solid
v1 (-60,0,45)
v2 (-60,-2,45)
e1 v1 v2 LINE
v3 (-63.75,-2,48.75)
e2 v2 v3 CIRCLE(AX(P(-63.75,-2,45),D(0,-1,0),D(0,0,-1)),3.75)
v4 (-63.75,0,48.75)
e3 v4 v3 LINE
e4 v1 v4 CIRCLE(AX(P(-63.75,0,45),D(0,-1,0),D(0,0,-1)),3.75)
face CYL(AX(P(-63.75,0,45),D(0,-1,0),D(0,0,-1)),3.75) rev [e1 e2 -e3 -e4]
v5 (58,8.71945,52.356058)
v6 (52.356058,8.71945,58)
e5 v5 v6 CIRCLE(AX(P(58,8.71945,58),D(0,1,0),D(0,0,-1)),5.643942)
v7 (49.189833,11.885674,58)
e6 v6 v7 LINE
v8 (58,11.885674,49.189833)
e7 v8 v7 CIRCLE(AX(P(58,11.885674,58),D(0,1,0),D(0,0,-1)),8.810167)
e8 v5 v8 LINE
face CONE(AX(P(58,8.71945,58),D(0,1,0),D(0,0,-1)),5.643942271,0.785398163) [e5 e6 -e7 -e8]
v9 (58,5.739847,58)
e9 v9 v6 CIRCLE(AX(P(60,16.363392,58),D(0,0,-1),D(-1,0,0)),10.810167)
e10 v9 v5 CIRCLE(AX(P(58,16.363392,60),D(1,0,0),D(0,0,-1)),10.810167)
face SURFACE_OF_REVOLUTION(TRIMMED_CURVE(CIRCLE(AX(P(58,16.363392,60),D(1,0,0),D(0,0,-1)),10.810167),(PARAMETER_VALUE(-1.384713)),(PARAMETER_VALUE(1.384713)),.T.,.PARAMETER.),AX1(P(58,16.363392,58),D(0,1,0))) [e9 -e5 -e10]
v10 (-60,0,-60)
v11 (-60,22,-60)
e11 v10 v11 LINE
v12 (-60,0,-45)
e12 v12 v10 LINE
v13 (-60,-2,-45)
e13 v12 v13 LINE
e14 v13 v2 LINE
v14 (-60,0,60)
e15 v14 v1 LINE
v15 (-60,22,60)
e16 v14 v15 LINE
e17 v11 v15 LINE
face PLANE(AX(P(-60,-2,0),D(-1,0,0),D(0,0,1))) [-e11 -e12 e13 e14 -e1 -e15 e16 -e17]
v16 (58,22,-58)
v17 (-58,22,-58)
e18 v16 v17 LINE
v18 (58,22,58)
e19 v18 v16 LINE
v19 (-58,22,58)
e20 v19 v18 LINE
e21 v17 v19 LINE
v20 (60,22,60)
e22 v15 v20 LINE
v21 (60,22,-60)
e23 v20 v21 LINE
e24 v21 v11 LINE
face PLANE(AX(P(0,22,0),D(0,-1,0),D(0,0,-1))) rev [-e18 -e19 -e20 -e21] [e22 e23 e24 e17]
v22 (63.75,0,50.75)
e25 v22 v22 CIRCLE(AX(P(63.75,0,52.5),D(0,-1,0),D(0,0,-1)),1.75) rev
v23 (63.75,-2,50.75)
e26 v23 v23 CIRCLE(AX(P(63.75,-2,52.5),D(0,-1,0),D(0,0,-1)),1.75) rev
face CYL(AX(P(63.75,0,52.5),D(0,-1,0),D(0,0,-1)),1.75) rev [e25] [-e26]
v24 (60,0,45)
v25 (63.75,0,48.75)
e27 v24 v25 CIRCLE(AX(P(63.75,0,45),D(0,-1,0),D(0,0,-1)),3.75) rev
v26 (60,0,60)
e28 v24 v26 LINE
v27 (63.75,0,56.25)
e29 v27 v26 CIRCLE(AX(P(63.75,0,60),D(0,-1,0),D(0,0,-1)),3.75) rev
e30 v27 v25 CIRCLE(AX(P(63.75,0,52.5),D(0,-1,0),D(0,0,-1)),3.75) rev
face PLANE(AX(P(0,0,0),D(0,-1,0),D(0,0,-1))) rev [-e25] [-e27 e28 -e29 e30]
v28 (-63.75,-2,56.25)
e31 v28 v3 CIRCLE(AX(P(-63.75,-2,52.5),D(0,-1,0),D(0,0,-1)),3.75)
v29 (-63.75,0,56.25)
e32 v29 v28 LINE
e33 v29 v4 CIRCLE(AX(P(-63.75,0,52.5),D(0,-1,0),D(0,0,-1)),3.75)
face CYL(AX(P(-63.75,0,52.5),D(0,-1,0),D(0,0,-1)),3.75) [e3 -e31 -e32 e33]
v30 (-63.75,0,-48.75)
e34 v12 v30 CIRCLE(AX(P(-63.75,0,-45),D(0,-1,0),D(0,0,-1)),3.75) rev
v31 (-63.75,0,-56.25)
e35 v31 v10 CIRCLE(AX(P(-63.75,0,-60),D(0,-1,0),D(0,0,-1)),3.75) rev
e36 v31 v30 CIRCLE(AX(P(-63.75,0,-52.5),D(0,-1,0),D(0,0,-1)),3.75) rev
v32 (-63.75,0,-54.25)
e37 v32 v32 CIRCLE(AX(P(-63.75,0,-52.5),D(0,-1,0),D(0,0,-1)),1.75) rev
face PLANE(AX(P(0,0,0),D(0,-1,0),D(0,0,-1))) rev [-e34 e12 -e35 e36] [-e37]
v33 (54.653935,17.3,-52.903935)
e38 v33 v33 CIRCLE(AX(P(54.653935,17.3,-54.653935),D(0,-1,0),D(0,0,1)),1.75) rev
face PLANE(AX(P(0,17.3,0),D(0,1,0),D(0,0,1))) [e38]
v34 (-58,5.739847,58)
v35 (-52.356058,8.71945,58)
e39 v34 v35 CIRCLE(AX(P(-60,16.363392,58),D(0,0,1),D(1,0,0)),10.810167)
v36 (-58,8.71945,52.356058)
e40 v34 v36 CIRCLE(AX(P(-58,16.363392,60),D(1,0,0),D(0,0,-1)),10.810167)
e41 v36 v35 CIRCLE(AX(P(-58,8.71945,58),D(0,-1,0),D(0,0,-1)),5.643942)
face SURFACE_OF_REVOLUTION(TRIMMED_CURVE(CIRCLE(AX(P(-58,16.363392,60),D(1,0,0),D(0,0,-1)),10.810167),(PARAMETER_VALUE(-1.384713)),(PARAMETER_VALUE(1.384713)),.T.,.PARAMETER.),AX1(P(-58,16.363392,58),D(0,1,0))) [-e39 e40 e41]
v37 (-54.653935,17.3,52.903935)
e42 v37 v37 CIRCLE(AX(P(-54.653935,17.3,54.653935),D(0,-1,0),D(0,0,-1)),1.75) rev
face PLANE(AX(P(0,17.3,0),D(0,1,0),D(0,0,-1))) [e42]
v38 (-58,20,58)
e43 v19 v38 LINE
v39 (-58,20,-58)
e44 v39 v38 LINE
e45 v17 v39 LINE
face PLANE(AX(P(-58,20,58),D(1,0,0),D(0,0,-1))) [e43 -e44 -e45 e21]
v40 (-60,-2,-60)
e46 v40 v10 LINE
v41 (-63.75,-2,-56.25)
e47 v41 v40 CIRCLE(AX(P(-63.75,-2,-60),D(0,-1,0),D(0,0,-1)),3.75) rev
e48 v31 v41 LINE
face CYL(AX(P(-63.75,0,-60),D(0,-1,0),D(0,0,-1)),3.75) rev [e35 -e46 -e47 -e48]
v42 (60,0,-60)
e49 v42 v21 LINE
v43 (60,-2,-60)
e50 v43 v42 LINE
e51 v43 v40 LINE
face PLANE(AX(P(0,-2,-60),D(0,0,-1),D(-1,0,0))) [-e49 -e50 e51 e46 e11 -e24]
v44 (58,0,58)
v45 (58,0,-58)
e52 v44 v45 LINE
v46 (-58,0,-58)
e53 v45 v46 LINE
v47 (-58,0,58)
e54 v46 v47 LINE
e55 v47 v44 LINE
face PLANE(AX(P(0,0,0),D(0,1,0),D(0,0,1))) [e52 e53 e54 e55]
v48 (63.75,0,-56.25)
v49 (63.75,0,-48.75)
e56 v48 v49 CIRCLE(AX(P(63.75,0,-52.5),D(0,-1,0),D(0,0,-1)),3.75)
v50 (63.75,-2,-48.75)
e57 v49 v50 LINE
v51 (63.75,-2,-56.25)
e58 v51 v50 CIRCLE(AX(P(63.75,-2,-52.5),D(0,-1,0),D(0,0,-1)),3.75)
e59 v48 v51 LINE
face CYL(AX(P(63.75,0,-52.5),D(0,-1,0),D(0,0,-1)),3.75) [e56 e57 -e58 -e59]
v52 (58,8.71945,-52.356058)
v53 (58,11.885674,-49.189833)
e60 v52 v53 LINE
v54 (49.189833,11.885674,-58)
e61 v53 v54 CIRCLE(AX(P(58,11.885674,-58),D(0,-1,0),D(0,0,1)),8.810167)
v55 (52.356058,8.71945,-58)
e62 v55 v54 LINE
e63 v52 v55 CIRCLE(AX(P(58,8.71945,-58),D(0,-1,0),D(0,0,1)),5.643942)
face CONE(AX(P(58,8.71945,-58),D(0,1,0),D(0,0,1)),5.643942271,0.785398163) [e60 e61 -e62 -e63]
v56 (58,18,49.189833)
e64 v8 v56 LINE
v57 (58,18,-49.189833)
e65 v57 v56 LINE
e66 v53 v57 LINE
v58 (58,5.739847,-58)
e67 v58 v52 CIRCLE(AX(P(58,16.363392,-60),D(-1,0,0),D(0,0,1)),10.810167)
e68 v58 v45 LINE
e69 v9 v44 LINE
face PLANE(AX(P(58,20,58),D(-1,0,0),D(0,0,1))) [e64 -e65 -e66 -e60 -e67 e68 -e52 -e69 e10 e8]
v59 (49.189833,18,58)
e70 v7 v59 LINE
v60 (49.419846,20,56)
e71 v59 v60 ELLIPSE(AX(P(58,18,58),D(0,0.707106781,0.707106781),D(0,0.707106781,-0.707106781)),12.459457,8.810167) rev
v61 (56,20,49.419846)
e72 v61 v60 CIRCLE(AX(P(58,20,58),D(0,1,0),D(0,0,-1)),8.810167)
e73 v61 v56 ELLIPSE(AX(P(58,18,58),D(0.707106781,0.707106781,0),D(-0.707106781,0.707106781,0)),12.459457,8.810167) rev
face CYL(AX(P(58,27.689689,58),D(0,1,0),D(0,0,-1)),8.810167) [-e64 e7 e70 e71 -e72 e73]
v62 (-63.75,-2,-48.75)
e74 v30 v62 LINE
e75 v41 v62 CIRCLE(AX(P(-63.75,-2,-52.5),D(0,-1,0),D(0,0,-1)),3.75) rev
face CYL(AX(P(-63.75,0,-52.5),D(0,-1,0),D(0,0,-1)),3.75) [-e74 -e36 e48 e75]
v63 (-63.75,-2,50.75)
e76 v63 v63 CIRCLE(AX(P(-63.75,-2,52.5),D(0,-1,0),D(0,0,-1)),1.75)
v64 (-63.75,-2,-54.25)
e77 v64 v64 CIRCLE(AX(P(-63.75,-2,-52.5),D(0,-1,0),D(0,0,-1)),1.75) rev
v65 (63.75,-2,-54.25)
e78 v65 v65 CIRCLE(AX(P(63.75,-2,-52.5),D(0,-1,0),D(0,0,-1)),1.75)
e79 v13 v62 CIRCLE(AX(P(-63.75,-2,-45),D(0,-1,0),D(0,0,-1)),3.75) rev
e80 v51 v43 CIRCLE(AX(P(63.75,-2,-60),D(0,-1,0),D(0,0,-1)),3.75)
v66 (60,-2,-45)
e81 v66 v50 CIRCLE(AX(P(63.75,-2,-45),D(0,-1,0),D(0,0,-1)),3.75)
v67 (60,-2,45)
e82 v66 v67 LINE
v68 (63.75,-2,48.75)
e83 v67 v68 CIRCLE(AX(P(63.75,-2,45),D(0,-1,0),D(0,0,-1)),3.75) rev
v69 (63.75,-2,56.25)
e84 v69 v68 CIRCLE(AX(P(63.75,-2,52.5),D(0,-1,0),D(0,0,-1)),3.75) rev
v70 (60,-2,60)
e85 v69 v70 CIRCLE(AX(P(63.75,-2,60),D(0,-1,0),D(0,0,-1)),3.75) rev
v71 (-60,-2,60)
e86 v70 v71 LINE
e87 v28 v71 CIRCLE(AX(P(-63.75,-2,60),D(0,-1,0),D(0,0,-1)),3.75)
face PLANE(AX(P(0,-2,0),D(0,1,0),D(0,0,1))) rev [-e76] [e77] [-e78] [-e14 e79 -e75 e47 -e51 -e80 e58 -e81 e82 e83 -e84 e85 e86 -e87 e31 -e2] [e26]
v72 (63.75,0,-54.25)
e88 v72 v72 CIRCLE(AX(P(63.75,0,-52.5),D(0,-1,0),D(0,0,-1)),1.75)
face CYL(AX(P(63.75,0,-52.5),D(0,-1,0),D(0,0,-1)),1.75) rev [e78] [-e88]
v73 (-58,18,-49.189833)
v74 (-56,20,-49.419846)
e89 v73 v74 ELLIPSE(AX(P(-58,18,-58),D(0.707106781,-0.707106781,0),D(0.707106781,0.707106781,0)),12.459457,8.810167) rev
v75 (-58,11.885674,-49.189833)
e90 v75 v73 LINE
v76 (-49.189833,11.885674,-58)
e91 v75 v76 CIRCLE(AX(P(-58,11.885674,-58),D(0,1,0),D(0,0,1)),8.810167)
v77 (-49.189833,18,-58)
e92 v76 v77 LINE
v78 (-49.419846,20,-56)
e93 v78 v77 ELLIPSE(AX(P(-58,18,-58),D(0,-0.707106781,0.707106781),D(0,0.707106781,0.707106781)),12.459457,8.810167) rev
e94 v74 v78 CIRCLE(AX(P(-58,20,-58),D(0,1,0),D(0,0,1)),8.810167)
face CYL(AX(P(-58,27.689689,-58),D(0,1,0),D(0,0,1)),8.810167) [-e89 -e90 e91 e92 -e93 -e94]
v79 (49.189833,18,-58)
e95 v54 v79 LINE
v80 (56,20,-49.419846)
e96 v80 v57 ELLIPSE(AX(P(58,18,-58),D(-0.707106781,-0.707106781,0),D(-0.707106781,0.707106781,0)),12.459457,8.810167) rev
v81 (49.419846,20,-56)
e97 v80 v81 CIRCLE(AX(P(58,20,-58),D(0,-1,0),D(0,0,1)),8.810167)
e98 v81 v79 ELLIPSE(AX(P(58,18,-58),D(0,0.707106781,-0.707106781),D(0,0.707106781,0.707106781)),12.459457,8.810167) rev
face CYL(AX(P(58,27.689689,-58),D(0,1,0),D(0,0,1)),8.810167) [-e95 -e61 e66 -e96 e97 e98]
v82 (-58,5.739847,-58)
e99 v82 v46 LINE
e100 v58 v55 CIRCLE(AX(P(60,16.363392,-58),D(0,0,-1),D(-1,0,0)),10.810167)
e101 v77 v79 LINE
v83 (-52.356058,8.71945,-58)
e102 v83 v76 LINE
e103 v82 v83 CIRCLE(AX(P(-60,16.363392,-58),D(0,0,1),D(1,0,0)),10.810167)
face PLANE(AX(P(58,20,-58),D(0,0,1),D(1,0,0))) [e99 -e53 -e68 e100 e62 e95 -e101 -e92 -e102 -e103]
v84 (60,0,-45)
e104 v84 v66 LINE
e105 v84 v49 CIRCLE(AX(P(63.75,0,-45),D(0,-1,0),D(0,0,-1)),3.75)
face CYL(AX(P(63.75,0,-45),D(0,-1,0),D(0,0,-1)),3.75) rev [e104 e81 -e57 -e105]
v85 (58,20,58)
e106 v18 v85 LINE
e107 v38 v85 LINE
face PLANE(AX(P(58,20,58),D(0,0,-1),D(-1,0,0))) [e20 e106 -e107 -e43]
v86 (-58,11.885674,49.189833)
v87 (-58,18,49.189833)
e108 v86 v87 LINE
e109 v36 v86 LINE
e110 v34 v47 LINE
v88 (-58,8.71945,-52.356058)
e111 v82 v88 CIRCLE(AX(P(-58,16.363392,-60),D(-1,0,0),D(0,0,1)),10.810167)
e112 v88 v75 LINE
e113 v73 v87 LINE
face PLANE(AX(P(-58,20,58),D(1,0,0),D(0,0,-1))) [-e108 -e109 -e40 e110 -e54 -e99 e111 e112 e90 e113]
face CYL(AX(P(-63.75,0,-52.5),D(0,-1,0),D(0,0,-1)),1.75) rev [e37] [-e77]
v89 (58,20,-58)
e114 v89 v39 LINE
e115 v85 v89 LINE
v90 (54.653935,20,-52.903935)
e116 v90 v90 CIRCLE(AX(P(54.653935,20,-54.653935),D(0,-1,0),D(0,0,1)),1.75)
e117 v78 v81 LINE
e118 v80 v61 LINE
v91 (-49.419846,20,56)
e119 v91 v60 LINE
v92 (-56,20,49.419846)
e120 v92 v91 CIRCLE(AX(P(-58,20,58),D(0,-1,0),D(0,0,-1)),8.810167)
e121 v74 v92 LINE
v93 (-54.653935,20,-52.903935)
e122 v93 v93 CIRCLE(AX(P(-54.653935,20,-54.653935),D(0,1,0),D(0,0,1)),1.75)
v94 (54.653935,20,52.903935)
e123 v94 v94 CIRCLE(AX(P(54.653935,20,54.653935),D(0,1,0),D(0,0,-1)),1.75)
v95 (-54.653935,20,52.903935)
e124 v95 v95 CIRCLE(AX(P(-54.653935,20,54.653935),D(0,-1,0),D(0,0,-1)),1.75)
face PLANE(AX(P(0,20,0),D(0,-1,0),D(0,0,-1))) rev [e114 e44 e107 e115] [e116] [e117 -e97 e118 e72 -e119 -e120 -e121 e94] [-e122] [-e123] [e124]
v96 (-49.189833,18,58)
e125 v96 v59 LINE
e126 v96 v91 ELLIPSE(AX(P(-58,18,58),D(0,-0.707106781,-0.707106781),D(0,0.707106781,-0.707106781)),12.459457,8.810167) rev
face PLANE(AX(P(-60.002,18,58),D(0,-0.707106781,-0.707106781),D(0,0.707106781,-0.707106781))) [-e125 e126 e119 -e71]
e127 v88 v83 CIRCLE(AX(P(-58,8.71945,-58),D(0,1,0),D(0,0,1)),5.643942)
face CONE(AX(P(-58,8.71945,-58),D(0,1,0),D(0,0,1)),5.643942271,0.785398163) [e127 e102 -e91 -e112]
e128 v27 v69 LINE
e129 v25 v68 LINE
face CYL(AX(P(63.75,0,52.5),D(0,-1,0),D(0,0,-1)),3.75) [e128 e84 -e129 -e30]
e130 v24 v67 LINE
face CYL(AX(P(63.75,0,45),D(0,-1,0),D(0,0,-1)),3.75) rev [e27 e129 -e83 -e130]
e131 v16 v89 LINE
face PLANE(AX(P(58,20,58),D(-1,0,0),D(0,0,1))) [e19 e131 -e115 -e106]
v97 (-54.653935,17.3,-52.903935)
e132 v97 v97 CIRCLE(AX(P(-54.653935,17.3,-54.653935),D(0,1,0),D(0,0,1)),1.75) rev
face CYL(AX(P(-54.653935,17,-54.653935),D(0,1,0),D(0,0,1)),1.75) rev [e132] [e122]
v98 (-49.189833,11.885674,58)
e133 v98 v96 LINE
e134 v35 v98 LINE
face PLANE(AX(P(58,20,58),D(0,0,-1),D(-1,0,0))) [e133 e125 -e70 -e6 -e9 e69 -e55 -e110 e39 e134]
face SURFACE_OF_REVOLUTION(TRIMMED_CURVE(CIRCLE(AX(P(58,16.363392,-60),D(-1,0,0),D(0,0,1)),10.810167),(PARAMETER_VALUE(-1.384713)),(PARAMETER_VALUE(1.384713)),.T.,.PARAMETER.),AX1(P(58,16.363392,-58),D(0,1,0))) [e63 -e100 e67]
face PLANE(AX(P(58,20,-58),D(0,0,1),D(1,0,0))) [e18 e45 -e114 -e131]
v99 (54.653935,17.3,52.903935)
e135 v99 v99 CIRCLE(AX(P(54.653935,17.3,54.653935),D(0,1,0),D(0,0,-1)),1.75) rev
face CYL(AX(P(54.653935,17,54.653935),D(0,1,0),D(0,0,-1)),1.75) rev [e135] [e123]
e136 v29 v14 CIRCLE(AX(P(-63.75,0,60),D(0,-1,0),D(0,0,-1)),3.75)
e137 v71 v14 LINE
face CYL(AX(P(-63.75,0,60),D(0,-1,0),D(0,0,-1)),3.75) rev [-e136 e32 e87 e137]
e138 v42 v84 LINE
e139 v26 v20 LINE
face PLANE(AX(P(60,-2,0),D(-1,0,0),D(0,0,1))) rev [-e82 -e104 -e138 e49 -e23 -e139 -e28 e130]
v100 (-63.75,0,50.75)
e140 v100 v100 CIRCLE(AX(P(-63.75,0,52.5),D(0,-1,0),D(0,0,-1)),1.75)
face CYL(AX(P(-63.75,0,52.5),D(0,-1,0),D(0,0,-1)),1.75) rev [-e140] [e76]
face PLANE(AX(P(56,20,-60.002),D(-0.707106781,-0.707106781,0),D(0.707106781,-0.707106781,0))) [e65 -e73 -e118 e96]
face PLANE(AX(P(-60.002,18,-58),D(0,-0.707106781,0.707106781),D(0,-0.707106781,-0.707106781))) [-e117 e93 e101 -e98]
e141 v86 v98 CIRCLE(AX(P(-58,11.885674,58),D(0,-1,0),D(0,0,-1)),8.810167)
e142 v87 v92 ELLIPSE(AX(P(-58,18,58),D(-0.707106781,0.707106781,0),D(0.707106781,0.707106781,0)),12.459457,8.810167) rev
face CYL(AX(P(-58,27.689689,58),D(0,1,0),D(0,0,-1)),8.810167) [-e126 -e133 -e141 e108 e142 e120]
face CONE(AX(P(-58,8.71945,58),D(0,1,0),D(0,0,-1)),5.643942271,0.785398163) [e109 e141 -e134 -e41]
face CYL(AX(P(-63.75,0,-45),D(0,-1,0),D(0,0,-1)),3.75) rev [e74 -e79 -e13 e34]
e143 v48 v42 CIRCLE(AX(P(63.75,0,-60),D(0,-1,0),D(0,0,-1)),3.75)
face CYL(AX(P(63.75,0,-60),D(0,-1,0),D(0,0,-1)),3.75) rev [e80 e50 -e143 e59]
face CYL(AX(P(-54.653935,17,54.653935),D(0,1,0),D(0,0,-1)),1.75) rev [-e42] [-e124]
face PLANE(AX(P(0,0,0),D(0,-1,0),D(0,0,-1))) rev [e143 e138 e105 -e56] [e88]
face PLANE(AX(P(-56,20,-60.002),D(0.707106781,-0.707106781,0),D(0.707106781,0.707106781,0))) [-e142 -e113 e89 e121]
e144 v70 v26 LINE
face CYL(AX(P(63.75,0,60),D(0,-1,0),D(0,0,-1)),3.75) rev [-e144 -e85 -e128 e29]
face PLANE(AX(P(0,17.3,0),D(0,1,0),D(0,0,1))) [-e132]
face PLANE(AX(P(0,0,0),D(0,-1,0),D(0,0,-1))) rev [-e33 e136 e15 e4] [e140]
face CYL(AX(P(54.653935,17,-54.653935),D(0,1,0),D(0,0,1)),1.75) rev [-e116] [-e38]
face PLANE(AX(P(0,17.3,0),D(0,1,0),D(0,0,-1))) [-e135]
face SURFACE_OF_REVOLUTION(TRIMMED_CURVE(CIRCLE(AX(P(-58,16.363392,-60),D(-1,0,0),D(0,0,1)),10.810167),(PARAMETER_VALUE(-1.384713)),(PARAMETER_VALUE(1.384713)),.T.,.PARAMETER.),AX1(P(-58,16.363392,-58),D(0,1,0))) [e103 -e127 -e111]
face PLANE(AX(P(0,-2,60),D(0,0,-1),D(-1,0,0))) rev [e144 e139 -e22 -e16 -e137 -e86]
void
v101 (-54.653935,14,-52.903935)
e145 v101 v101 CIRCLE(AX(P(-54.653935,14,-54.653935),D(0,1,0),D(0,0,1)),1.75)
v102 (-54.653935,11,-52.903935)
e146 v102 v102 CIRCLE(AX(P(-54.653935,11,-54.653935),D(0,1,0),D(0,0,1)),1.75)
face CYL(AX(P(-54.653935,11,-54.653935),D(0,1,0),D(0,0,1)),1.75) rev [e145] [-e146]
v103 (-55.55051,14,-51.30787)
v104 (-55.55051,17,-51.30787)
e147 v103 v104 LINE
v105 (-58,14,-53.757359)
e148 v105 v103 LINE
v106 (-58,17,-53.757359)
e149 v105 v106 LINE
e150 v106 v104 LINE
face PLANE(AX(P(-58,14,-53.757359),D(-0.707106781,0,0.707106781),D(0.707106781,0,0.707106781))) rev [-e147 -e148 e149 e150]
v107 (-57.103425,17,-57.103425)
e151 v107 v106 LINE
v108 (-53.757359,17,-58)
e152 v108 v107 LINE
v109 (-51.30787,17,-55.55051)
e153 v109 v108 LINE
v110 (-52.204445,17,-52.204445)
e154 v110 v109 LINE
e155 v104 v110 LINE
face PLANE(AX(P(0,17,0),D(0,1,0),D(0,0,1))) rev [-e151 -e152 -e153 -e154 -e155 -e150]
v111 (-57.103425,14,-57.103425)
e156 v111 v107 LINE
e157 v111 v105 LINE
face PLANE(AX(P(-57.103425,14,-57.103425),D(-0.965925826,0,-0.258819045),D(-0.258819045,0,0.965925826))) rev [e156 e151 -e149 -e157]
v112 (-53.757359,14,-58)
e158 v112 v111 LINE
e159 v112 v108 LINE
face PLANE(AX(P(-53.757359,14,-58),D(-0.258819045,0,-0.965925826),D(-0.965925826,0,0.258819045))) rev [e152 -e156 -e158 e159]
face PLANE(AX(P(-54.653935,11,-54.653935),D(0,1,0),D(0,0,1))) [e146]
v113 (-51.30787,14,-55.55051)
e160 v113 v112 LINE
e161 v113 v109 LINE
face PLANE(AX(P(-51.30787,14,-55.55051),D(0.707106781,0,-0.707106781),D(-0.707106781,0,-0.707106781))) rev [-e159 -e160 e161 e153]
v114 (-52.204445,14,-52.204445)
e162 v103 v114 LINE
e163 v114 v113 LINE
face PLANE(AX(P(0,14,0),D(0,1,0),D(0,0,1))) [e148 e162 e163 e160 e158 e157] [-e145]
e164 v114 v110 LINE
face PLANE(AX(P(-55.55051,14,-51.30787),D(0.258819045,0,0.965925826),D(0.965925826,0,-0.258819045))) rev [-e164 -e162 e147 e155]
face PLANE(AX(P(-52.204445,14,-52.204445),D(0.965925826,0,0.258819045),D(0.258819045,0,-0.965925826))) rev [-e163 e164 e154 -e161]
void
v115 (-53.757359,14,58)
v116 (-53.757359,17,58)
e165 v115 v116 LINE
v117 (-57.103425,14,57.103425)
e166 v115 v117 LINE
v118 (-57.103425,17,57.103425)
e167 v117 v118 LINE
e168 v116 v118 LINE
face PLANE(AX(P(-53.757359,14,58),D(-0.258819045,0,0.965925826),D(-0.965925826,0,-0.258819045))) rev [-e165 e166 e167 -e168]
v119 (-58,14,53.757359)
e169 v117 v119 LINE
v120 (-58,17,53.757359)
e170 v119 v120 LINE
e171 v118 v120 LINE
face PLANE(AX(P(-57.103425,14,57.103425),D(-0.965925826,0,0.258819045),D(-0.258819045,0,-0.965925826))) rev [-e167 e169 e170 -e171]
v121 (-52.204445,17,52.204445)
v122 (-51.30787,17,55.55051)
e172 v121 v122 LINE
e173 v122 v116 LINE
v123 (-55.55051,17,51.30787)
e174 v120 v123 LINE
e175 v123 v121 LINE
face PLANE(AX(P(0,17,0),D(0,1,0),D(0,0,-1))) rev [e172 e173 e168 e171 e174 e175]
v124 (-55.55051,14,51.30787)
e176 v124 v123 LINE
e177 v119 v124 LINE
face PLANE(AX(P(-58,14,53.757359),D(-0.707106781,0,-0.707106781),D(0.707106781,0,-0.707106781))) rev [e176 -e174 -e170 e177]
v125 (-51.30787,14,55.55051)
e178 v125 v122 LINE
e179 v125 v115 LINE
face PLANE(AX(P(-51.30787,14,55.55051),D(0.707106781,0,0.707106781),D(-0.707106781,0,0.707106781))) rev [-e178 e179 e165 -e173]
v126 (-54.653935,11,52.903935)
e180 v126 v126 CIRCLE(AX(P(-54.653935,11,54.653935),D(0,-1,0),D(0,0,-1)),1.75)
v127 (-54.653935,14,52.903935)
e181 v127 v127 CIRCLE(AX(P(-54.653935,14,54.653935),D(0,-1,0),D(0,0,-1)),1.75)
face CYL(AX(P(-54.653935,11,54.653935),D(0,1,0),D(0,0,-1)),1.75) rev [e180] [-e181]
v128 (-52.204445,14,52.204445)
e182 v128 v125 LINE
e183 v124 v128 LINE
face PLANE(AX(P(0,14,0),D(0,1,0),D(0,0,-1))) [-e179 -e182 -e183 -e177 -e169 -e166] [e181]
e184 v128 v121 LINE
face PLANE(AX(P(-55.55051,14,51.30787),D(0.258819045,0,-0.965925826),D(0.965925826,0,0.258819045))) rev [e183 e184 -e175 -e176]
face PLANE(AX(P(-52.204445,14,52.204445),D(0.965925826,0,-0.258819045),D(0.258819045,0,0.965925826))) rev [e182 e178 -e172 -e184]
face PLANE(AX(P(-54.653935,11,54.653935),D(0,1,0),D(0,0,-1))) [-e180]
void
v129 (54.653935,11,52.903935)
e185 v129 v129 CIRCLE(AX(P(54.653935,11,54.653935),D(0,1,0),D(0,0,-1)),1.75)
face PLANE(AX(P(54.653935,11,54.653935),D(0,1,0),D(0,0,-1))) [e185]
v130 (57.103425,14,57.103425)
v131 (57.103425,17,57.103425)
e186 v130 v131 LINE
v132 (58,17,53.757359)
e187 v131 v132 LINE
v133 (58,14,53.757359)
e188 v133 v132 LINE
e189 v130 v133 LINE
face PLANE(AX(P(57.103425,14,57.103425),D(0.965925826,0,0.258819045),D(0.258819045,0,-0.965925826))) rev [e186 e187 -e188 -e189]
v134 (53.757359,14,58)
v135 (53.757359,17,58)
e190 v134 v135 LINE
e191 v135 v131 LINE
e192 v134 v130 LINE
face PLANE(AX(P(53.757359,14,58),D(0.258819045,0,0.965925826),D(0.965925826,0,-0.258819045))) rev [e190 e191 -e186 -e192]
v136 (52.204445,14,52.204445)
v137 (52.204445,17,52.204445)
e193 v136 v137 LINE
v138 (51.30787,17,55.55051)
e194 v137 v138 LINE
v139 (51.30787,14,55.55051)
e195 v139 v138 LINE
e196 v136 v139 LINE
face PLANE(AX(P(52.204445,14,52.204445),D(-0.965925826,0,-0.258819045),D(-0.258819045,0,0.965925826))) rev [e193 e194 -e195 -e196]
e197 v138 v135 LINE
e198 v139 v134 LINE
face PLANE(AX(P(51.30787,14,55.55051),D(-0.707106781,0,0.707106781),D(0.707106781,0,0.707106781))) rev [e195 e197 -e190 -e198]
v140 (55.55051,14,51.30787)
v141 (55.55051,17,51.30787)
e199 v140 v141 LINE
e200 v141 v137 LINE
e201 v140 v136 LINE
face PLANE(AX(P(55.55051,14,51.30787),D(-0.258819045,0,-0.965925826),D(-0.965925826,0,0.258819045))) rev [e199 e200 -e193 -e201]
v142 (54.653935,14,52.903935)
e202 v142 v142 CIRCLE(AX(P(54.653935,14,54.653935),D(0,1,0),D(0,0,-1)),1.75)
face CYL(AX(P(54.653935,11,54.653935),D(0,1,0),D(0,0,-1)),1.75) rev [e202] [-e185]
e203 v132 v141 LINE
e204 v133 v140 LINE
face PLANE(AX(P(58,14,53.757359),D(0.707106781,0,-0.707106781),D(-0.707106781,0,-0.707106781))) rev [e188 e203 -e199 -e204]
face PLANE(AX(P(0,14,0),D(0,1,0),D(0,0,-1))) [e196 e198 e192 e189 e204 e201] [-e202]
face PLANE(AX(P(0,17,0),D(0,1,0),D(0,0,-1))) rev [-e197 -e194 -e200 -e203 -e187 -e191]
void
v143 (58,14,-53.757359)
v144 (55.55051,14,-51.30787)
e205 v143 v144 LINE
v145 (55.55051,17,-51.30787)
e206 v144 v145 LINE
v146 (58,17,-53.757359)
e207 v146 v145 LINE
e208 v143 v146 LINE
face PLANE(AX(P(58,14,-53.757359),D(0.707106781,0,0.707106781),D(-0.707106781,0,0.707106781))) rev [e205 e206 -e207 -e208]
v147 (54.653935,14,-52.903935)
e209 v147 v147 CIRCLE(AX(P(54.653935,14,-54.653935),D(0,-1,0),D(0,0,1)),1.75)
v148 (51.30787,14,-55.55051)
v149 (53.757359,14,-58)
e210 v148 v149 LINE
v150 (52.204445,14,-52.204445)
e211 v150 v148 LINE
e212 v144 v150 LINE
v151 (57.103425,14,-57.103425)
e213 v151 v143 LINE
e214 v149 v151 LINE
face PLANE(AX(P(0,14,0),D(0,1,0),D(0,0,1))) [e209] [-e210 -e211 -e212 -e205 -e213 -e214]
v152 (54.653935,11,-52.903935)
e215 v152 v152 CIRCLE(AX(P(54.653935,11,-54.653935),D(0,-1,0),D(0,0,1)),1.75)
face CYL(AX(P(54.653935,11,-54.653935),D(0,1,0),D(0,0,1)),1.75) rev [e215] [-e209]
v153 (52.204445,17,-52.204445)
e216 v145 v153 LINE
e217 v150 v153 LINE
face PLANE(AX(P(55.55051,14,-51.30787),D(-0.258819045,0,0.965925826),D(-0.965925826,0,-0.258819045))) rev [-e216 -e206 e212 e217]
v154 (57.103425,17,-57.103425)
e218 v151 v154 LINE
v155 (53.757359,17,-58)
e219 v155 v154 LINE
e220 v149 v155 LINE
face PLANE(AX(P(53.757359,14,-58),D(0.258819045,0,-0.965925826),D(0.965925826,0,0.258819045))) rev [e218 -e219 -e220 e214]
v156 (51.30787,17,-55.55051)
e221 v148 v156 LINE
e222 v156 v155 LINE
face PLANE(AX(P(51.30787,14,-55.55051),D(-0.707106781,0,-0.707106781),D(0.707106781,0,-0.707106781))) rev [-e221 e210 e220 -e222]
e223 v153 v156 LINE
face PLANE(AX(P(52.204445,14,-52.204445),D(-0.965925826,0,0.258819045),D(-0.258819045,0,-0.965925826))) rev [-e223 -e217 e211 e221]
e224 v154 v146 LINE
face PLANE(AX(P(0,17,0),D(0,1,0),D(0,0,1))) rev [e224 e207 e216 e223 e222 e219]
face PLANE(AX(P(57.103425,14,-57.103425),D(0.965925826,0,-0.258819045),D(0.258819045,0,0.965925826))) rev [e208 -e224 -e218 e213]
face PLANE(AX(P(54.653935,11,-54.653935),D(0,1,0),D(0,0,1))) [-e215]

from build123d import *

# Parameters (mm, degrees)
SKETCH1_W                       = 120
SKETCH1_H                       = 120
SKETCH1_W_2                     = 116
SKETCH1_H_2                     = 116
BOSS_EXTRUDE1_DEPTH             = 2
SKETCH1_3_W                     = 120
SKETCH1_3_H                     = 120
SKETCH1_3_W_2                   = 116
SKETCH1_3_H_2                   = 116
BOSS_EXTRUDE2_DEPTH             = 20
BOSS_EXTRUDE4_DEPTH             = 20
SKETCH16_R                      = 1.75
CUT_EXTRUDE8_DEPTH              = 3
CUT_EXTRUDE9_DEPTH              = 3
BOSS_EXTRUDE5_DEPTH             = 0.3
SKETCH18_R                      = 1.75
CUT_EXTRUDE10_DEPTH             = 3
CUT_REVOLVE5_DEPTH              = 5.739847272
CUT_REVOLVE5_START              = 1.8876
CUT_REVOLVE5_2_DEPTH            = 18.1124
CUT_REVOLVE5_3_ANGLE            = 90
SKETCH21_W                      = 120
SKETCH21_H                      = 120
SKETCH21_W_2                    = 116
SKETCH21_H_2                    = 116
BOSS_EXTRUDE6_DEPTH             = 2
BOSS_EXTRUDE7_REACH             = 89.658
BOSS_EXTRUDE7_DIRECTION_2_REACH = 89.658
BOSS_EXTRUDE8_REACH             = 89.658
BOSS_EXTRUDE8_DIRECTION_2_REACH = 89.658
SKETCH25_R                      = 3.75
SKETCH25_R_2                    = 1.75
BOSS_EXTRUDE10_DEPTH            = 2


with BuildPart() as part:
    # Sketch1 → Boss-Extrude1 (new body)
    # profile 1 of 2: a face of its own
    with BuildSketch(Plane(origin=(0, 0, 0), x_dir=(1, 0, 0), z_dir=(0, 1, 0))):
        Rectangle(SKETCH1_W, SKETCH1_H)
        Rectangle(SKETCH1_W_2, SKETCH1_H_2, mode=Mode.SUBTRACT)
    # profile 2 of 2: a face of its own
    with BuildSketch(Plane(origin=(0, 0, 0), x_dir=(1, 0, 0), z_dir=(0, 1, 0))):
        Rectangle(SKETCH1_W_2, SKETCH1_H_2)
    extrude(amount=-BOSS_EXTRUDE1_DEPTH)

    # Sketch1<3> → Boss-Extrude2 (add)
    with BuildSketch(Plane(origin=(0, 0, 0), x_dir=(1, 0, 0), z_dir=(0, 1, 0))):
        Rectangle(SKETCH1_3_W, SKETCH1_3_H)
        Rectangle(SKETCH1_3_W_2, SKETCH1_3_H_2, mode=Mode.SUBTRACT)
    extrude(amount=BOSS_EXTRUDE2_DEPTH)


with BuildPart() as body_2:
    # Sketch15 → Boss-Extrude4 (new body)
    with BuildSketch(Plane(origin=(0, 20, 0), x_dir=(1, 0, 0), z_dir=(0, 1, 0))):
        with BuildLine():
            Line((-50.334183167, 58), (-49.18983317, 58))
            Line((-49.18983317, 58), (-49.18983317, 60))
            Line((-49.18983317, 60), (-53.524336105, 60))
            ThreePointArc((-53.524336105, 60), (-51.751547032, 59.283465193), (-50.334183167, 58))
        make_face()
        with BuildLine():
            ThreePointArc((-60, 53.524336105), (-59.283465193, 51.751547032), (-58, 50.334183167))
            Line((-58, 50.334183167), (-58, 58))
            Line((-58, 58), (-50.334183167, 58))
            ThreePointArc((-50.334183167, 58), (-51.751547032, 59.283465193), (-53.524336105, 60))
            Line((-53.524336105, 60), (-55.783533465, 60))
            ThreePointArc((-55.783533465, 60), (-58.51763809, 58.51763809), (-60, 55.783533465))
            Line((-60, 55.783533465), (-60, 53.524336105))
        make_face()
        with BuildLine():
            Line((-60, 60), (-60, 55.783533465))
            ThreePointArc((-60, 55.783533465), (-58.51763809, 58.51763809), (-55.783533465, 60))
            Line((-55.783533465, 60), (-60, 60))
        make_face()
        with BuildLine():
            Line((-60, 49.18983317), (-58, 49.18983317))
            Line((-58, 49.18983317), (-58, 50.334183167))
            ThreePointArc((-58, 50.334183167), (-59.283465193, 51.751547032), (-60, 53.524336105))
            Line((-60, 53.524336105), (-60, 49.18983317))
        make_face()
        with BuildLine():
            Line((-58, 49.18983317), (-54.653934785, 49.18983317))
            ThreePointArc((-54.653934785, 49.18983317), (-56.422103989, 49.483829938), (-58, 50.334183167))
            Line((-58, 50.334183167), (-58, 49.18983317))
        make_face()
        with BuildLine():
            ThreePointArc((-58, 50.334183167), (-56.422103989, 49.483829938), (-54.653934785, 49.18983317))
            ThreePointArc((-54.653934785, 49.18983317), (-50.79023148, 50.79023148), (-49.18983317, 54.653934785))
            ThreePointArc((-49.18983317, 54.653934785), (-49.483829938, 56.422103989), (-50.334183167, 58))
            Line((-50.334183167, 58), (-58, 58))
            Line((-58, 58), (-58, 50.334183167))
        make_face()
        with BuildLine():
            ThreePointArc((-50.334183167, 58), (-49.483829938, 56.422103989), (-49.18983317, 54.653934785))
            Line((-49.18983317, 54.653934785), (-49.18983317, 58))
            Line((-49.18983317, 58), (-50.334183167, 58))
        make_face()
    extrude(amount=-BOSS_EXTRUDE4_DEPTH)

    # Sketch16 → Cut-Extrude8 (cut)
    with BuildSketch(Plane(origin=(0, 20, 0), x_dir=(1, 0, 0), z_dir=(0, 1, 0))):
        with Locations(Location((-54.653934785, 54.653934785, 0), (0, 0, 270))):
            Circle(SKETCH16_R)
    extrude(amount=-CUT_EXTRUDE8_DEPTH, mode=Mode.SUBTRACT)

    # Sketch17 → Cut-Extrude9 (cut)
    with BuildSketch(Plane(origin=(0, 17, 0), x_dir=(1, 0, 0), z_dir=(0, 1, 0))):
        Polygon((-55.550510257, 51.30786957), (-52.204445042, 52.204445042), (-51.30786957, 55.550510257), (-53.757359313, 58), (-57.103424528, 57.103424528), (-58, 53.757359313), align=None)
    extrude(amount=-CUT_EXTRUDE9_DEPTH, mode=Mode.SUBTRACT)

    # Sketch17<2> → Boss-Extrude5 (add)
    with BuildSketch(Plane(origin=(0, 17, 0), x_dir=(1, 0, 0), z_dir=(0, 1, 0))):
        Polygon((-55.550510257, 51.30786957), (-52.204445042, 52.204445042), (-51.30786957, 55.550510257), (-53.757359313, 58), (-57.103424528, 57.103424528), (-58, 53.757359313), align=None)
    extrude(amount=BOSS_EXTRUDE5_DEPTH)

    # Sketch18 → Cut-Extrude10 (cut)
    with BuildSketch(Plane(origin=(0, 14, 0), x_dir=(1, 0, 0), z_dir=(0, 1, 0))):
        with Locations(Location((-54.653934785, 54.653934785, 0), (0, 0, 270))):
            Circle(SKETCH18_R)
    extrude(amount=-CUT_EXTRUDE10_DEPTH, mode=Mode.SUBTRACT)

    # Cut-Revolve5: read off the stored shape, not the designer's step
    # Cut-Revolve5 outline → Cut-Revolve5 (cut)
    with BuildSketch(Plane(origin=(0, 0, 0), x_dir=(1, 0, 0), z_dir=(0, 1, 0))):
        with BuildLine():
            Line((-49.18983317, 58), (-58, 58))
            Line((-58, 58), (-58, 49.18983317))
            Line((-58, 49.18983317), (-54.653934785, 49.18983317))
            ThreePointArc((-54.653934785, 49.18983317), (-50.79023148, 50.79023148), (-49.18983317, 54.653934785))
            Line((-49.18983317, 54.653934785), (-49.18983317, 58))
        make_face()
    extrude(amount=CUT_REVOLVE5_DEPTH, mode=Mode.SUBTRACT)

    # Cut-Revolve5 2 outline → Cut-Revolve5 2 (cut)
    with BuildSketch(Plane(origin=(0, 0, 0), x_dir=(1, 0, 0), z_dir=(0, 1, 0)).offset(CUT_REVOLVE5_START)):
        with BuildLine():
            ThreePointArc((-49.18983317, 58), (-51.770271291, 51.770271291), (-58, 49.18983317))
            Line((-58, 49.18983317), (-54.653934785, 49.18983317))
            ThreePointArc((-54.653934785, 49.18983317), (-50.79023148, 50.79023148), (-49.18983317, 54.653934785))
            Line((-49.18983317, 54.653934785), (-49.18983317, 58))
        make_face()
    extrude(amount=CUT_REVOLVE5_2_DEPTH, mode=Mode.SUBTRACT)

    # Cut-Revolve5 3 outline → Cut-Revolve5 3 (revolve, cut)
    with BuildSketch(Plane(origin=(-58, 0, -58), x_dir=(0, 0, 1), z_dir=(-1, 0, 0))):
        with BuildLine():
            add(Edge.make_bspline(
                [(0, 5.739847272), (3.282261739, 6.357769399), (5.643942271, 8.719449932)],
                knots=[4.898472057, 4.898472057, 4.898472057, 5.497787144, 5.497787144, 5.497787144], degree=2, weights=[1, 0.955437636, 1]))
            Line((0, 5.739847272), (8.81016683, 5.739847272))
            Line((8.81016683, 5.739847272), (8.81016683, 11.88567449))
            Line((8.81016683, 11.88567449), (5.643942271, 8.719449932))
        make_face()
    revolve(axis=Axis((-58, 0, -58), (0, 1, 0)), revolution_arc=CUT_REVOLVE5_3_ANGLE, mode=Mode.SUBTRACT)


with BuildPart() as body_3:
    # Mirror1: mirrored copy
    add(body_2.part.mirror(Plane.XY))


with BuildPart() as body_4:
    # Mirror2: mirrored copy
    add(body_2.part.mirror(Plane(origin=(0, 0, 0), x_dir=(0, 0, 1), z_dir=(1, 0, 0))))


with BuildPart() as body_5:
    # Mirror2 2: mirrored copy
    add(body_3.part.mirror(Plane(origin=(0, 0, 0), x_dir=(0, 0, 1), z_dir=(1, 0, 0))))


with BuildPart() as part_1:
    add(part.part)

    # Combine1: union body 2, body 3, body 5, body 4
    add(body_2.part)
    add(body_3.part)
    add(body_5.part)
    add(body_4.part)

    # Sketch21 → Boss-Extrude6 (add)
    with BuildSketch(Plane(origin=(0, 20, 0), x_dir=(1, 0, 0), z_dir=(0, 1, 0))):
        Rectangle(SKETCH21_W, SKETCH21_H)
        Rectangle(SKETCH21_W_2, SKETCH21_H_2, mode=Mode.SUBTRACT)
    extrude(amount=BOSS_EXTRUDE6_DEPTH)

    # Sketch23 → Boss-Extrude7 (add, up to next)
    with BuildSketch(Plane.XY, mode=Mode.PRIVATE) as boss_extrude7_sk1:
        Polygon((-58, 20), (-56, 20), (-58, 18), align=None)
    boss_extrude7_tool1 = extrude(boss_extrude7_sk1.sketch, amount=BOSS_EXTRUDE7_REACH, mode=Mode.PRIVATE) - part_1.part
    # Sketch23 → Boss-Extrude7 (add, up to next)
    with BuildSketch(Plane.XY, mode=Mode.PRIVATE) as boss_extrude7_sk2:
        Polygon((58, 18), (58, 20), (56, 20), align=None)
    boss_extrude7_tool2 = extrude(boss_extrude7_sk2.sketch, amount=BOSS_EXTRUDE7_REACH, mode=Mode.PRIVATE) - part_1.part
    add(boss_extrude7_tool1.solids().sort_by_distance((-57.333333, 19.333333, 0))[0])
    add(boss_extrude7_tool2.solids().sort_by_distance((57.333333, 19.333333, 0))[0])

    # Sketch23 → Boss-Extrude7 direction 2 (add, up to next)
    with BuildSketch(Plane.XY, mode=Mode.PRIVATE) as boss_extrude7_direction_2_sk1:
        Polygon((-58, 20), (-56, 20), (-58, 18), align=None)
    boss_extrude7_direction_2_tool1 = extrude(boss_extrude7_direction_2_sk1.sketch, amount=-BOSS_EXTRUDE7_DIRECTION_2_REACH, mode=Mode.PRIVATE) - part_1.part
    # Sketch23 → Boss-Extrude7 direction 2 (add, up to next)
    with BuildSketch(Plane.XY, mode=Mode.PRIVATE) as boss_extrude7_direction_2_sk2:
        Polygon((58, 18), (58, 20), (56, 20), align=None)
    boss_extrude7_direction_2_tool2 = extrude(boss_extrude7_direction_2_sk2.sketch, amount=-BOSS_EXTRUDE7_DIRECTION_2_REACH, mode=Mode.PRIVATE) - part_1.part
    add(boss_extrude7_direction_2_tool1.solids().sort_by_distance((-57.333333, 19.333333, 0))[0])
    add(boss_extrude7_direction_2_tool2.solids().sort_by_distance((57.333333, 19.333333, 0))[0])

    # Sketch24 → Boss-Extrude8 (add, up to next)
    with BuildSketch(Plane(origin=(0, 0, 0), x_dir=(0, 0, -1), z_dir=(1, 0, 0)), mode=Mode.PRIVATE) as boss_extrude8_sk1:
        Polygon((58, 20), (58, 18), (56, 20), align=None)
    boss_extrude8_tool1 = extrude(boss_extrude8_sk1.sketch, amount=BOSS_EXTRUDE8_REACH, mode=Mode.PRIVATE) - part_1.part
    # Sketch24 → Boss-Extrude8 (add, up to next)
    with BuildSketch(Plane(origin=(0, 0, 0), x_dir=(0, 0, -1), z_dir=(1, 0, 0)), mode=Mode.PRIVATE) as boss_extrude8_sk2:
        Polygon((-56, 20), (-58, 20), (-58, 18), align=None)
    boss_extrude8_tool2 = extrude(boss_extrude8_sk2.sketch, amount=BOSS_EXTRUDE8_REACH, mode=Mode.PRIVATE) - part_1.part
    add(boss_extrude8_tool1.solids().sort_by_distance((0, 19.333333, -57.333333))[0])
    add(boss_extrude8_tool2.solids().sort_by_distance((0, 19.333333, 57.333333))[0])

    # Sketch24 → Boss-Extrude8 direction 2 (add, up to next)
    with BuildSketch(Plane(origin=(0, 0, 0), x_dir=(0, 0, -1), z_dir=(1, 0, 0)), mode=Mode.PRIVATE) as boss_extrude8_direction_2_sk1:
        Polygon((58, 20), (58, 18), (56, 20), align=None)
    boss_extrude8_direction_2_tool1 = extrude(boss_extrude8_direction_2_sk1.sketch, amount=-BOSS_EXTRUDE8_DIRECTION_2_REACH, mode=Mode.PRIVATE) - part_1.part
    # Sketch24 → Boss-Extrude8 direction 2 (add, up to next)
    with BuildSketch(Plane(origin=(0, 0, 0), x_dir=(0, 0, -1), z_dir=(1, 0, 0)), mode=Mode.PRIVATE) as boss_extrude8_direction_2_sk2:
        Polygon((-56, 20), (-58, 20), (-58, 18), align=None)
    boss_extrude8_direction_2_tool2 = extrude(boss_extrude8_direction_2_sk2.sketch, amount=-BOSS_EXTRUDE8_DIRECTION_2_REACH, mode=Mode.PRIVATE) - part_1.part
    add(boss_extrude8_direction_2_tool1.solids().sort_by_distance((0, 19.333333, -57.333333))[0])
    add(boss_extrude8_direction_2_tool2.solids().sort_by_distance((0, 19.333333, 57.333333))[0])

    # Sketch25 → Boss-Extrude10 (add)
    # profile 1 of 20: a face of its own
    with BuildSketch(Plane.XZ.offset(2)):
        with BuildLine():
            Line((60, 60), (60, 56.25))
            Line((60, 56.25), (63.75, 56.25))
            ThreePointArc((63.75, 56.25), (61.098349571, 57.348349571), (60, 60))
        make_face()
    # profile 2 of 20: a face of its own
    with BuildSketch(Plane.XZ.offset(2)):
        with BuildLine():
            Line((60, 56.25), (60, 52.5))
            ThreePointArc((60, 52.5), (61.098349571, 55.151650429), (63.75, 56.25))
            Line((63.75, 56.25), (60, 56.25))
        make_face()
    # profile 3 of 20: a face of its own
    with BuildSketch(Plane.XZ.offset(2)):
        with Locations((63.75, 52.5)):
            Circle(SKETCH25_R)
        with Locations(Location((63.75, 52.5, 0), (0, 0, 270))):
            Circle(SKETCH25_R_2, mode=Mode.SUBTRACT)
    # profile 4 of 20: a face of its own
    with BuildSketch(Plane.XZ.offset(2)):
        with BuildLine():
            Line((60, 52.5), (60, 48.75))
            Line((60, 48.75), (63.75, 48.75))
            ThreePointArc((63.75, 48.75), (61.098349571, 49.848349571), (60, 52.5))
        make_face()
    # profile 5 of 20: a face of its own
    with BuildSketch(Plane.XZ.offset(2)):
        with BuildLine():
            Line((60, 48.75), (60, 45))
            ThreePointArc((60, 45), (61.098349571, 47.651650429), (63.75, 48.75))
            Line((63.75, 48.75), (60, 48.75))
        make_face()
    # profile 6 of 20: a face of its own
    with BuildSketch(Plane.XZ.offset(2)):
        with BuildLine():
            ThreePointArc((63.75, -48.75), (61.098349571, -47.651650429), (60, -45))
            Line((60, -45), (60, -48.75))
            Line((60, -48.75), (63.75, -48.75))
        make_face()
    # profile 7 of 20: a face of its own
    with BuildSketch(Plane.XZ.offset(2)):
        with BuildLine():
            Line((63.75, -48.75), (60, -48.75))
            Line((60, -48.75), (60, -52.5))
            ThreePointArc((60, -52.5), (61.098349571, -49.848349571), (63.75, -48.75))
        make_face()
    # profile 8 of 20: a face of its own
    with BuildSketch(Plane.XZ.offset(2)):
        with Locations((63.75, -52.5)):
            Circle(SKETCH25_R)
        with Locations(Location((63.75, -52.5, 0), (0, 0, 270))):
            Circle(SKETCH25_R_2, mode=Mode.SUBTRACT)
    # profile 9 of 20: a face of its own
    with BuildSketch(Plane.XZ.offset(2)):
        with BuildLine():
            ThreePointArc((63.75, -56.25), (61.098349571, -55.151650429), (60, -52.5))
            Line((60, -52.5), (60, -56.25))
            Line((60, -56.25), (63.75, -56.25))
        make_face()
    # profile 10 of 20: a face of its own
    with BuildSketch(Plane.XZ.offset(2)):
        with BuildLine():
            Line((63.75, -56.25), (60, -56.25))
            Line((60, -56.25), (60, -60))
            ThreePointArc((60, -60), (61.098349571, -57.348349571), (63.75, -56.25))
        make_face()
    # profile 11 of 20: a face of its own
    with BuildSketch(Plane.XZ.offset(2)):
        with BuildLine():
            Line((-60, -48.75), (-60, -45))
            ThreePointArc((-60, -45), (-61.098349571, -47.651650429), (-63.75, -48.75))
            Line((-63.75, -48.75), (-60, -48.75))
        make_face()
    # profile 12 of 20: a face of its own
    with BuildSketch(Plane.XZ.offset(2)):
        with BuildLine():
            Line((-60, -52.5), (-60, -48.75))
            Line((-60, -48.75), (-63.75, -48.75))
            ThreePointArc((-63.75, -48.75), (-61.098349571, -49.848349571), (-60, -52.5))
        make_face()
    # profile 13 of 20: a face of its own
    with BuildSketch(Plane.XZ.offset(2)):
        with BuildLine():
            Line((-60, -56.25), (-60, -52.5))
            ThreePointArc((-60, -52.5), (-61.098349571, -55.151650429), (-63.75, -56.25))
            Line((-63.75, -56.25), (-60, -56.25))
        make_face()
    # profile 14 of 20: a face of its own
    with BuildSketch(Plane.XZ.offset(2)):
        with BuildLine():
            Line((-60, -56.25), (-63.75, -56.25))
            ThreePointArc((-63.75, -56.25), (-61.098349571, -57.348349571), (-60, -60))
            Line((-60, -60), (-60, -56.25))
        make_face()
    # profile 15 of 20: a face of its own
    with BuildSketch(Plane.XZ.offset(2)):
        with Locations((-63.75, -52.5)):
            Circle(SKETCH25_R)
        with Locations(Location((-63.75, -52.5, 0), (0, 0, 270))):
            Circle(SKETCH25_R_2, mode=Mode.SUBTRACT)
    # profile 16 of 20: a face of its own
    with BuildSketch(Plane.XZ.offset(2)):
        with BuildLine():
            Line((-63.75, 56.25), (-60, 56.25))
            Line((-60, 56.25), (-60, 60))
            ThreePointArc((-60, 60), (-61.098349571, 57.348349571), (-63.75, 56.25))
        make_face()
    # profile 17 of 20: a face of its own
    with BuildSketch(Plane.XZ.offset(2)):
        with BuildLine():
            Line((-60, 52.5), (-60, 56.25))
            Line((-60, 56.25), (-63.75, 56.25))
            ThreePointArc((-63.75, 56.25), (-61.098349571, 55.151650429), (-60, 52.5))
        make_face()
    # profile 18 of 20: a face of its own
    with BuildSketch(Plane.XZ.offset(2)):
        with Locations((-63.75, 52.5)):
            Circle(SKETCH25_R)
        with Locations(Location((-63.75, 52.5, 0), (0, 0, 270))):
            Circle(SKETCH25_R_2, mode=Mode.SUBTRACT)
    # profile 19 of 20: a face of its own
    with BuildSketch(Plane.XZ.offset(2)):
        with BuildLine():
            Line((-60, 48.75), (-60, 52.5))
            ThreePointArc((-60, 52.5), (-61.098349571, 49.848349571), (-63.75, 48.75))
            Line((-63.75, 48.75), (-60, 48.75))
        make_face()
    # profile 20 of 20: a face of its own
    with BuildSketch(Plane.XZ.offset(2)):
        with BuildLine():
            Line((-60, 48.75), (-63.75, 48.75))
            ThreePointArc((-63.75, 48.75), (-61.098349571, 47.651650429), (-60, 45))
            Line((-60, 45), (-60, 48.75))
        make_face()
    extrude(amount=-BOSS_EXTRUDE10_DEPTH)


solid = part_1.part
